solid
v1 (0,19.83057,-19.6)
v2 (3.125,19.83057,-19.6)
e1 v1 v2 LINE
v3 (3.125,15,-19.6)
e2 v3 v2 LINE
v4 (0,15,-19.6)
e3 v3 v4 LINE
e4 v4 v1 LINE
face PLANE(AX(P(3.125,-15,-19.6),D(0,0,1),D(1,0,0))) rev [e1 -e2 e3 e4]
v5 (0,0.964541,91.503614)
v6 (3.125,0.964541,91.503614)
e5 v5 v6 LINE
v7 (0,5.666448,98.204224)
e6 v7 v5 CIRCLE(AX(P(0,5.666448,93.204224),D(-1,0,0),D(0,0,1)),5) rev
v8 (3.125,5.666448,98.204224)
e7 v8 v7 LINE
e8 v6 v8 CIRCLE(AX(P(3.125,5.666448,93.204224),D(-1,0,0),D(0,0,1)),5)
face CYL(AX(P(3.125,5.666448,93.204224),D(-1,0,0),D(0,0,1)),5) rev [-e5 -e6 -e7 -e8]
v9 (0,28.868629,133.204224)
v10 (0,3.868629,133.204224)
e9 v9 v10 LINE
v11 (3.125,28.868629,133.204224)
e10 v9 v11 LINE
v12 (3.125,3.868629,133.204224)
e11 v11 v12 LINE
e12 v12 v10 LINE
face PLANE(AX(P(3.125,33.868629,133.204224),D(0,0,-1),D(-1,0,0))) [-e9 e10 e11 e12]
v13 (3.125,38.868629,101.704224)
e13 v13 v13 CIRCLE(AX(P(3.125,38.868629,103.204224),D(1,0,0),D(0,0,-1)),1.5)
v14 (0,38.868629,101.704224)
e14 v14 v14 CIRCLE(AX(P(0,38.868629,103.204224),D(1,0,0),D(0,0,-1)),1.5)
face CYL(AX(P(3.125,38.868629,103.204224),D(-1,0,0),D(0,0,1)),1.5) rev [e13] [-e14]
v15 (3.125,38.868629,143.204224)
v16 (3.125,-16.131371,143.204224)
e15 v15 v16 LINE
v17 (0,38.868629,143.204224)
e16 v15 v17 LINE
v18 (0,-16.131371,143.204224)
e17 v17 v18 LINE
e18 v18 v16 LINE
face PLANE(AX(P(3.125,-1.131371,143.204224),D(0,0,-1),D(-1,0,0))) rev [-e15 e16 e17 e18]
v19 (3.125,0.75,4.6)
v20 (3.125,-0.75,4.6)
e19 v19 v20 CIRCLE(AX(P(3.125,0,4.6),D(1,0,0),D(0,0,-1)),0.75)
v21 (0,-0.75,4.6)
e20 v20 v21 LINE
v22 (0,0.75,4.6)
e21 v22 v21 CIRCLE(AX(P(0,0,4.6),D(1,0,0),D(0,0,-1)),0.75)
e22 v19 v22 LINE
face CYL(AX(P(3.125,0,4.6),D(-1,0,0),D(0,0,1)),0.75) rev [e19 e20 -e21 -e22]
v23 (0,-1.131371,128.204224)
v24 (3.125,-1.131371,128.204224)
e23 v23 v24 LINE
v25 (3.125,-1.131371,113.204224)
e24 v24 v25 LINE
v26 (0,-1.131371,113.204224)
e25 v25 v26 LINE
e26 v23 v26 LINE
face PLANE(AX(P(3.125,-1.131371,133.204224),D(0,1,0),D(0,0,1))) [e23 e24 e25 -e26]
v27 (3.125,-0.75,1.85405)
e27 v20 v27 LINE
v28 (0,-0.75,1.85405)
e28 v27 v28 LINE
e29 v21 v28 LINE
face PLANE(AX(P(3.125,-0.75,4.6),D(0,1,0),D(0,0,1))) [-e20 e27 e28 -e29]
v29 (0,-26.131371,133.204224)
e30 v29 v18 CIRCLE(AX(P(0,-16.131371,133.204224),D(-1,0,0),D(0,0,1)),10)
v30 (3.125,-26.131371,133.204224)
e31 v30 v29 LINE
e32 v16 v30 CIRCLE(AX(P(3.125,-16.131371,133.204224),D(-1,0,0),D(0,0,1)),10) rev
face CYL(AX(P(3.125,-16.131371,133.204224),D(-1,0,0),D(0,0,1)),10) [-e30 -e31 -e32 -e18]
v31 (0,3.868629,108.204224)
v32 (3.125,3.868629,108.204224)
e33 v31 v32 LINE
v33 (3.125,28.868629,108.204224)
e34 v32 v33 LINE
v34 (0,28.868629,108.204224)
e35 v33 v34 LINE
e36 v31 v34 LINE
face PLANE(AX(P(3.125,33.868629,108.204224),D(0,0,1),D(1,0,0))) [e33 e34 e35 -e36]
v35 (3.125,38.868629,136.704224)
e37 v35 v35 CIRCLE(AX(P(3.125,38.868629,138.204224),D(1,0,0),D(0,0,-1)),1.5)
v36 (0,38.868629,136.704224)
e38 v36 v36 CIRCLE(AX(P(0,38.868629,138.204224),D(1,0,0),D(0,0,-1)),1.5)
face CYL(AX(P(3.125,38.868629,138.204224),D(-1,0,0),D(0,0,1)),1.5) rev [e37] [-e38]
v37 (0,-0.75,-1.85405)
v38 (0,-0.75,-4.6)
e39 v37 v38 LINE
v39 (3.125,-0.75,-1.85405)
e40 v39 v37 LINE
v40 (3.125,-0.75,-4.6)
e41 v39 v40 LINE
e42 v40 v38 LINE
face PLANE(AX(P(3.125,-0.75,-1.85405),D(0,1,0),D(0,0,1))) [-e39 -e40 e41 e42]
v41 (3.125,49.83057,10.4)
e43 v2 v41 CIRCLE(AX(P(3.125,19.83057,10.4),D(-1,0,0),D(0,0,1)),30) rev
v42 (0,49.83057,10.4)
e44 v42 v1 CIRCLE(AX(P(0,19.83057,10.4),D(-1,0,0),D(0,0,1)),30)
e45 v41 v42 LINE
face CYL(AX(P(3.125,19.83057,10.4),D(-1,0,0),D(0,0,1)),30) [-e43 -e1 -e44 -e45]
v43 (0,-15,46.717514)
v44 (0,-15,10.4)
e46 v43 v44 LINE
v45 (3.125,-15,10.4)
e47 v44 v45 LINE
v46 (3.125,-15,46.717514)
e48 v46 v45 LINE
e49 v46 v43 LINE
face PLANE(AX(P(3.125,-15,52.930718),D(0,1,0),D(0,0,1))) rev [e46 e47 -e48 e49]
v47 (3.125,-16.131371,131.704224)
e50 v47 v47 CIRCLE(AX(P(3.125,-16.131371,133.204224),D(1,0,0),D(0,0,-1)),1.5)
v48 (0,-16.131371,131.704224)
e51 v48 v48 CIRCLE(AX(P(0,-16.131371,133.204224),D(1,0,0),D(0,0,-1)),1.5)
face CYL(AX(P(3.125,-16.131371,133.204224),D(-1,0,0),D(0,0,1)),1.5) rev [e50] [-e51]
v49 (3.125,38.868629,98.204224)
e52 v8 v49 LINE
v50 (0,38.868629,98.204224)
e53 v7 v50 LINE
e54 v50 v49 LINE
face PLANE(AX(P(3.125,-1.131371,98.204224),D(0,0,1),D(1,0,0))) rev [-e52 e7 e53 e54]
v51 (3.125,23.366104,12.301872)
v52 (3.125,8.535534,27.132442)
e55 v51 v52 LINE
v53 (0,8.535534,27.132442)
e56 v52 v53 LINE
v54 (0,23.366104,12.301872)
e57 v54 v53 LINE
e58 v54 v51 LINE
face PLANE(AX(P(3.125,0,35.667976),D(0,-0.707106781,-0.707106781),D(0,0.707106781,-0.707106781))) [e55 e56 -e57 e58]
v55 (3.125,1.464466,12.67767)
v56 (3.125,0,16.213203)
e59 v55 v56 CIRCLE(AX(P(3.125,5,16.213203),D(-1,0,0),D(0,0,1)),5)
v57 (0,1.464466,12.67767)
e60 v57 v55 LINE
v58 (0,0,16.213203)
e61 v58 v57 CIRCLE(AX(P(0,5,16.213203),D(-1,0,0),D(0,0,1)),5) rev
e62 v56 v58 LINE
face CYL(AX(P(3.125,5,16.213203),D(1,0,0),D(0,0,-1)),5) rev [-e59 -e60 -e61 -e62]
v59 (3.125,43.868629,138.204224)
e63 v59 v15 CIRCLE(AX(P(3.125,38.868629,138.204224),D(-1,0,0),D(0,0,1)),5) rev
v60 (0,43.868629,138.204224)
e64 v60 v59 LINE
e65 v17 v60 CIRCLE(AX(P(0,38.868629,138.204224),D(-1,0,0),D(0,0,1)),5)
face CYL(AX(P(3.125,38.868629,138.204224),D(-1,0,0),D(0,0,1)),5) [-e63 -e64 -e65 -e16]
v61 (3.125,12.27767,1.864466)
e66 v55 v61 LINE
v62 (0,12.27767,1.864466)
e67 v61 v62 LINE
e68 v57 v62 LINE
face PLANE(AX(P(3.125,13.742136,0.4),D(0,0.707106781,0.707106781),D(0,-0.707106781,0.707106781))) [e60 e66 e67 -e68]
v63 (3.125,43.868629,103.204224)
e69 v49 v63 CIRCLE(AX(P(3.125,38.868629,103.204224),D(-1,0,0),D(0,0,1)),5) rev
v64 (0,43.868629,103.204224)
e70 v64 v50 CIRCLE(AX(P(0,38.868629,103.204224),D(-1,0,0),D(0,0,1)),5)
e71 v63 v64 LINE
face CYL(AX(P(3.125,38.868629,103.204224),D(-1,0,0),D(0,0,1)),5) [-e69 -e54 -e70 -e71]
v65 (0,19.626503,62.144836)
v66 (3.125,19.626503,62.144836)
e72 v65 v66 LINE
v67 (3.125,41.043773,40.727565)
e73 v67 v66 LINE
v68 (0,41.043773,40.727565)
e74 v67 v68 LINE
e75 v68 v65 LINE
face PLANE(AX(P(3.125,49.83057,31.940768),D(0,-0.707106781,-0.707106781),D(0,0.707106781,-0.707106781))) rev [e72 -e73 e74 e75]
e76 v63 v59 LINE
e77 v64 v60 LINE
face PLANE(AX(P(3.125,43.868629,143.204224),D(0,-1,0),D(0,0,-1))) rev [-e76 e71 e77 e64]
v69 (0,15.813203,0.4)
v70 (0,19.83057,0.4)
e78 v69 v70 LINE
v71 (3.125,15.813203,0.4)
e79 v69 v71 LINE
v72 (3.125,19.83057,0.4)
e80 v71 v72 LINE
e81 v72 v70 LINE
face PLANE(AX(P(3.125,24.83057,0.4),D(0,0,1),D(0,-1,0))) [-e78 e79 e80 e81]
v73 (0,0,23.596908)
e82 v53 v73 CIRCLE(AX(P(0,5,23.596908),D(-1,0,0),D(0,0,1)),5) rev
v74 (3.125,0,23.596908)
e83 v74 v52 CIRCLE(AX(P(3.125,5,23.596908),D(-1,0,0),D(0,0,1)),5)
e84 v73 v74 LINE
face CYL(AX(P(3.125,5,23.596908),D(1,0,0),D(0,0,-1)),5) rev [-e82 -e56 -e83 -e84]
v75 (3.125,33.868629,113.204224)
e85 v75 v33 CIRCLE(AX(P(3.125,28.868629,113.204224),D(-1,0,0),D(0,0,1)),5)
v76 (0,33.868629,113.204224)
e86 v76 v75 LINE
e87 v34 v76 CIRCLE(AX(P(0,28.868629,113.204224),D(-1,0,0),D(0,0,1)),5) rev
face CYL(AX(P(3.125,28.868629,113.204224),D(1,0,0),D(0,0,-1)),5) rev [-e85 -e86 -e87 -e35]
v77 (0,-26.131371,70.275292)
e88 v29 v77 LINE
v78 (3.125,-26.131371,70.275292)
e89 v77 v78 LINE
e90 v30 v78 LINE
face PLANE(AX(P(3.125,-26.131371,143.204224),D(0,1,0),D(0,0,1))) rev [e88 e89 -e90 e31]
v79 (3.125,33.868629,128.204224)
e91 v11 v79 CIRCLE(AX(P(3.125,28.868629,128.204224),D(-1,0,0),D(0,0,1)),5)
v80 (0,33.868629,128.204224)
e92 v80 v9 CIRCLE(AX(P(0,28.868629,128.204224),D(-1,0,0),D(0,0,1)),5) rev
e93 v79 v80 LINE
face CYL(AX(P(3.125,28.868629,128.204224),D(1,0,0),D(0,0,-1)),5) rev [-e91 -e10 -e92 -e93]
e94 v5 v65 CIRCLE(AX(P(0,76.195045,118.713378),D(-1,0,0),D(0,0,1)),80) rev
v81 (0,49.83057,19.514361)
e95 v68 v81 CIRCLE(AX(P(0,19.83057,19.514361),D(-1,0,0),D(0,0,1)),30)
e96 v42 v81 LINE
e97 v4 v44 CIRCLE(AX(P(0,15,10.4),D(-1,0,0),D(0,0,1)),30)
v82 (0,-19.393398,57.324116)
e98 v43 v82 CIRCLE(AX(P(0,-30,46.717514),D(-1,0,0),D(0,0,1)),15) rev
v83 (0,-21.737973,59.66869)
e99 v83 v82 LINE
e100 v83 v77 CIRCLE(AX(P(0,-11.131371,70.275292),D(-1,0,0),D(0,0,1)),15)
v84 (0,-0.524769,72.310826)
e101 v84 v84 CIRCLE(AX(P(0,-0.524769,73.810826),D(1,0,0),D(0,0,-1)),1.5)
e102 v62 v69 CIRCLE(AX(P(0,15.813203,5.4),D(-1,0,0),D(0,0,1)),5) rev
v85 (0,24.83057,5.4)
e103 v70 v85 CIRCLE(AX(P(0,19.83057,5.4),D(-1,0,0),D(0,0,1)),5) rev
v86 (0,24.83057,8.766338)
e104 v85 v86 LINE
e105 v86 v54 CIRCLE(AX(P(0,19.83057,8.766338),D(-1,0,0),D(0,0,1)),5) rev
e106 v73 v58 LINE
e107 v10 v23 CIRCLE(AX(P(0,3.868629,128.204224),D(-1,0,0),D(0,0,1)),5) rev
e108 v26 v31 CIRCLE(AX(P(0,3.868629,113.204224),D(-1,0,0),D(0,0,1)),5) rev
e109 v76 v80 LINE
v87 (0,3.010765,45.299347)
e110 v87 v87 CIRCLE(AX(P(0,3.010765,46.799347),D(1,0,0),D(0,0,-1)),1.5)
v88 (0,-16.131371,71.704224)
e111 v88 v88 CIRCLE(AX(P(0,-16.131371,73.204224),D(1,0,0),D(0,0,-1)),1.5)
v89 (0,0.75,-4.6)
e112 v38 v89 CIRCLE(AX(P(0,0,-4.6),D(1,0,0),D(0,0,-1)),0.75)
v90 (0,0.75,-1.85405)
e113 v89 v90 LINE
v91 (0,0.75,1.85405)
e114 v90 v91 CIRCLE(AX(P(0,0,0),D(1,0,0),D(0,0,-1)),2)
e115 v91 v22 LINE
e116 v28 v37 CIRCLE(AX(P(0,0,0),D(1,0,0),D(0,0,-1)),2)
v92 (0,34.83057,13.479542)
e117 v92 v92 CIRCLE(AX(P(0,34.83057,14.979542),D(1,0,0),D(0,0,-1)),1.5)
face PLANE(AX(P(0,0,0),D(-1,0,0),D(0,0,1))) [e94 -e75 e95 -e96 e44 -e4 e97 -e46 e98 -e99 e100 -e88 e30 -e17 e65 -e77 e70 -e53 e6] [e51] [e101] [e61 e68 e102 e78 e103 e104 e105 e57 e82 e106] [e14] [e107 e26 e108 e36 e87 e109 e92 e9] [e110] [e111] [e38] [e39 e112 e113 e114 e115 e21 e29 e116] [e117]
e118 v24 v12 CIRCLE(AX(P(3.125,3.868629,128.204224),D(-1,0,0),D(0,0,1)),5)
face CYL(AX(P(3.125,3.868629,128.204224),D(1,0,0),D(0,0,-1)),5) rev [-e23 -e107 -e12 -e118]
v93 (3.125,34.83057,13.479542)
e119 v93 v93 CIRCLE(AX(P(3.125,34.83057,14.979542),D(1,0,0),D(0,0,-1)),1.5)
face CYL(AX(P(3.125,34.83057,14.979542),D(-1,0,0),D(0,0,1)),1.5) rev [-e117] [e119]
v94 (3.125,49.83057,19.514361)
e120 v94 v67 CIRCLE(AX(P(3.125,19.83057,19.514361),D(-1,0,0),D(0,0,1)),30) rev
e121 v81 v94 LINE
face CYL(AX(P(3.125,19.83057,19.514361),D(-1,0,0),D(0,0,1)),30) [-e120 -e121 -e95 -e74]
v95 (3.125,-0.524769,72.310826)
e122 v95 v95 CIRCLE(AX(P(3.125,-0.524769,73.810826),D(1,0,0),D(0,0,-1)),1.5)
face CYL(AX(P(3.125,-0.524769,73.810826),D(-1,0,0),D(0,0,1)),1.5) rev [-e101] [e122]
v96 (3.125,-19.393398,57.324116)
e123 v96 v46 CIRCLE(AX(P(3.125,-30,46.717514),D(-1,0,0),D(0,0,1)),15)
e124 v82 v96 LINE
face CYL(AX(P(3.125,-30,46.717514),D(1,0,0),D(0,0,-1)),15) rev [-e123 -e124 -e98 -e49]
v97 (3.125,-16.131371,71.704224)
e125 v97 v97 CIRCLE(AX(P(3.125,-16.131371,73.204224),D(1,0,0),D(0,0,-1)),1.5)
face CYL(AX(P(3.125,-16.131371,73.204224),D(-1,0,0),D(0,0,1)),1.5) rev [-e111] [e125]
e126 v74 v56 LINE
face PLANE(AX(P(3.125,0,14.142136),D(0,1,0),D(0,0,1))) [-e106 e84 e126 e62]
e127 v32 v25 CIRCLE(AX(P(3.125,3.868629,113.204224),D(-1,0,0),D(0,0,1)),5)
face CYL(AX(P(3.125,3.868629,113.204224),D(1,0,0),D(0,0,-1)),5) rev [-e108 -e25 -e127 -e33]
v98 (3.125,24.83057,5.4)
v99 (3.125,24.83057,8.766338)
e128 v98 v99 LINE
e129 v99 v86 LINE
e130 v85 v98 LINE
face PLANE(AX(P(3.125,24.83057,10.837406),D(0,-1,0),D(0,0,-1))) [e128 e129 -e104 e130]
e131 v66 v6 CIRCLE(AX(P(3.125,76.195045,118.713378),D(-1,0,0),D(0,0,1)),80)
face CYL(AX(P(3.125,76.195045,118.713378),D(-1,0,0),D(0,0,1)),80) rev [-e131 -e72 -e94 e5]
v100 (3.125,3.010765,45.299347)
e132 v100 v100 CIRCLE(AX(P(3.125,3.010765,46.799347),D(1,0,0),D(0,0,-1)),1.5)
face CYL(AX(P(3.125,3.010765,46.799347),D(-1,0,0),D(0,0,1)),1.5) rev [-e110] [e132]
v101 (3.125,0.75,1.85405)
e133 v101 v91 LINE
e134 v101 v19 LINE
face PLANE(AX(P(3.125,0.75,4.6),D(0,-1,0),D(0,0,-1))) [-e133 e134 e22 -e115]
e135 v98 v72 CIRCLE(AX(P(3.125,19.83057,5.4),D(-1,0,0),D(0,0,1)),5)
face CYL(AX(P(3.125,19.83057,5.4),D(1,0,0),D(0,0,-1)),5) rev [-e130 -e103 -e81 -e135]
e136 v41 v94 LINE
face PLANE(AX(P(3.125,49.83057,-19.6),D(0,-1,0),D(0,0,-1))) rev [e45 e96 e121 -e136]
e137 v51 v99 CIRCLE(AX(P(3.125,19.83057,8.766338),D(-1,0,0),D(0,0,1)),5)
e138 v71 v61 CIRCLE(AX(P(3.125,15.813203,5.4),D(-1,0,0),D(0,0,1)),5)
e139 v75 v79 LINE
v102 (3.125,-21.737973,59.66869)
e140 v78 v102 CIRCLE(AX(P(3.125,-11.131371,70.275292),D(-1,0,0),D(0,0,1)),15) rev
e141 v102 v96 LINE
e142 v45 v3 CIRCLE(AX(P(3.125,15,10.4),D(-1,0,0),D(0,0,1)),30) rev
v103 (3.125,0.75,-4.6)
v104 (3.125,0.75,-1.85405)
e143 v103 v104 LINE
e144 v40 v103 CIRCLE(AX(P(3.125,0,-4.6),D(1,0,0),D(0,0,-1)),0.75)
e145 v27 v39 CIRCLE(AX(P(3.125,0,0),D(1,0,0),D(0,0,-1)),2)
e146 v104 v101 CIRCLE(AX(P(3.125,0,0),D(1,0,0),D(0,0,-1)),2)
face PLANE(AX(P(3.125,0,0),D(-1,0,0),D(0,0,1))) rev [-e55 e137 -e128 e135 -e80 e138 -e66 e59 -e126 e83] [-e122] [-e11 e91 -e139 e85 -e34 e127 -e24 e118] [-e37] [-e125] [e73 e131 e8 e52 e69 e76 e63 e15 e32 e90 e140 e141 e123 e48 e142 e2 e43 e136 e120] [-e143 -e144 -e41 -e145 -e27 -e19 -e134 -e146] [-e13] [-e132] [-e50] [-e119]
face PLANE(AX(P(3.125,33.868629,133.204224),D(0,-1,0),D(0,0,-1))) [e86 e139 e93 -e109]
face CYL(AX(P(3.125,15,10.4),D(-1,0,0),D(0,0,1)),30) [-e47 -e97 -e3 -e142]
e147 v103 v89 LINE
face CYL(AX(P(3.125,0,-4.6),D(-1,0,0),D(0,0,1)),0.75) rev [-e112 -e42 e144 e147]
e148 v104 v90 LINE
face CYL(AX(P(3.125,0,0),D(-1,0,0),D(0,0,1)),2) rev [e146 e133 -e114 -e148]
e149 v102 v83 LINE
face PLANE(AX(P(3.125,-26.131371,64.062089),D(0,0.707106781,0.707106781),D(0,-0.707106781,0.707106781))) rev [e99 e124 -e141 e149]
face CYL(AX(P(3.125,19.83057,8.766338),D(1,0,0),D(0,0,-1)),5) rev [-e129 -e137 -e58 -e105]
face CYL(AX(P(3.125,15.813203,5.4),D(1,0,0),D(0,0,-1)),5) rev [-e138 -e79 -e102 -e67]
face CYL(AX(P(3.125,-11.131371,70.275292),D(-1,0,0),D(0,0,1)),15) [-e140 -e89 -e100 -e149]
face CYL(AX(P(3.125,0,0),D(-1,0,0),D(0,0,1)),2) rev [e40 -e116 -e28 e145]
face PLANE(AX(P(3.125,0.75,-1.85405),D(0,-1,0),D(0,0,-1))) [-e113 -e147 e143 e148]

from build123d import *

# Parameters (mm, degrees)
SKETCH1_R           = 1.5
SKETCH1_W           = 25
SKETCH1_H           = 35
BOSS_EXTRUDE1_DEPTH = 3.125
FILLET2_R           = 15
FILLET3_R           = 30
FILLET4_R           = 30
FILLET5_R           = 80
FILLET6_R           = 30
FILLET7_R           = 5
FILLET1_R           = 10
FILLET8_R           = 5


with BuildPart() as part:
    # Sketch1 → Boss-Extrude1 (new body)
    with BuildSketch(Plane(origin=(0, 0, 0), x_dir=(0, 0, -1), z_dir=(1, 0, 0))):
        Polygon((-143.20422433, -1.13137085), (-143.20422433, -26.13137085), (-64.062088707, -26.13137085), (-52.930717857, -15), (19.6, -15), (19.6, 49.830569927), (-31.940768363, 49.830569927), (-82.90270914, -1.13137085), (-98.20422433, -1.13137085), (-98.20422433, 43.86862915), (-143.20422433, 43.86862915), align=None)
        with Locations((-46.799347007, 3.010764774)):
            Circle(SKETCH1_R, mode=Mode.SUBTRACT)
        with Locations((-14.979541854, 34.830569927)):
            Circle(SKETCH1_R, mode=Mode.SUBTRACT)
        with Locations((-73.810826048, -0.524769132)):
            Circle(SKETCH1_R, mode=Mode.SUBTRACT)
        with Locations((-73.20422433, -16.13137085)):
            Circle(SKETCH1_R, mode=Mode.SUBTRACT)
        with Locations((-133.20422433, -16.13137085)):
            Circle(SKETCH1_R, mode=Mode.SUBTRACT)
        with Locations((-138.20422433, 38.86862915)):
            Circle(SKETCH1_R, mode=Mode.SUBTRACT)
        with Locations((-103.20422433, 38.86862915)):
            Circle(SKETCH1_R, mode=Mode.SUBTRACT)
        with BuildLine():
            Line((-4.6, 0.75), (-1.854049622, 0.75))
            ThreePointArc((-1.854049622, 0.75), (0, 2), (1.854049622, 0.75))
            Line((1.854049622, 0.75), (4.6, 0.75))
            ThreePointArc((4.6, 0.75), (5.35, 0), (4.6, -0.75))
            Line((4.6, -0.75), (1.854049622, -0.75))
            ThreePointArc((1.854049622, -0.75), (0, -2), (-1.854049622, -0.75))
            Line((-1.854049622, -0.75), (-4.6, -0.75))
            ThreePointArc((-4.6, -0.75), (-5.35, 0), (-4.6, 0.75))
        make_face(mode=Mode.SUBTRACT)
        Polygon((-35.667976157, 0), (-10.83740623, 24.830569927), (-0.4, 24.830569927), (-0.4, 13.742135624), (-14.142135624, 0), align=None, mode=Mode.SUBTRACT)
        with Locations((-120.70422433, 16.36862915)):
            Rectangle(SKETCH1_W, SKETCH1_H, mode=Mode.SUBTRACT)
    extrude(amount=BOSS_EXTRUDE1_DEPTH)

    # Fillet2
    fillet2_edges = [part.edges().sort_by_distance(p)[0] for p in [
        (1.5625, -15, 52.930717857),
        (1.5625, -26.13137085, 64.062088707),
    ]]
    fillet(fillet2_edges, radius=FILLET2_R)

    # Fillet3
    fillet3_edges = [part.edges().sort_by_distance(p)[0] for p in [
        (1.5625, -15, -19.6),
    ]]
    fillet(fillet3_edges, radius=FILLET3_R)

    # Fillet4
    fillet4_edges = [part.edges().sort_by_distance(p)[0] for p in [
        (1.5625, 49.830569927, 31.940768363),
    ]]
    fillet(fillet4_edges, radius=FILLET4_R)

    # Fillet5
    # the kernel refuses this fillet: 80 mm, written as the material it adds along each edge
    with BuildSketch(Plane(origin=(0, -1.13137085, 82.90270914), x_dir=(0, 0.7071067811865434, -0.7071067811865517), z_dir=(1, 0, 0))) as fillet5_piece_1:
        with BuildLine():
            CenterArc((29.356066225, 80), FILLET5_R, 239.854448647, 30.145551353)
            Line((-10.819805153, 10.819805153), (-11.623322581, 9.436201256))
            ThreePointArc((-11.623322581, 9.436201256), (-6.541273427, 4.278531727), (-1.13137085, -1.13137085))
            Line((-1.13137085, -1.13137085), (0, -1.6))
            Line((0, -1.6), (29.356066225, -1.6))
            Line((29.356066225, -1.6), (29.356066225, 0))
        make_face()
    extrude(amount=3.125)

    # Fillet6
    fillet6_edges = [part.edges().sort_by_distance(p)[0] for p in [
        (1.5625, 49.830569927, -19.6),
    ]]
    fillet(fillet6_edges, radius=FILLET6_R)

    # Fillet7
    fillet7_edges = [part.edges().sort_by_distance(p)[0] for p in [
        (1.5625, 13.742135624, 0.4),
        (1.5625, 24.830569927, 0.4),
        (1.5625, 24.830569927, 10.83740623),
        (1.5625, 0, 35.667976157),
        (1.5625, 0, 14.142135624),
    ]]
    fillet(fillet7_edges, radius=FILLET7_R)

    # Fillet1
    fillet1_edges = [part.edges().sort_by_distance(p)[0] for p in [
        (1.5625, -26.13137085, 143.20422433),
    ]]
    fillet(fillet1_edges, radius=FILLET1_R)

    # Fillet8
    fillet8_edges = [part.edges().sort_by_distance(p)[0] for p in [
        (1.5625, 43.86862915, 143.20422433),
        (1.5625, 43.86862915, 98.20422433),
        (1.5625, -1.13137085, 98.20422433),
        (1.5625, 33.86862915, 133.20422433),
        (1.5625, -1.13137085, 133.20422433),
        (1.5625, -1.13137085, 108.20422433),
        (1.5625, 33.86862915, 108.20422433),
    ]]
    fillet(fillet8_edges, radius=FILLET8_R)


solid = part.part
